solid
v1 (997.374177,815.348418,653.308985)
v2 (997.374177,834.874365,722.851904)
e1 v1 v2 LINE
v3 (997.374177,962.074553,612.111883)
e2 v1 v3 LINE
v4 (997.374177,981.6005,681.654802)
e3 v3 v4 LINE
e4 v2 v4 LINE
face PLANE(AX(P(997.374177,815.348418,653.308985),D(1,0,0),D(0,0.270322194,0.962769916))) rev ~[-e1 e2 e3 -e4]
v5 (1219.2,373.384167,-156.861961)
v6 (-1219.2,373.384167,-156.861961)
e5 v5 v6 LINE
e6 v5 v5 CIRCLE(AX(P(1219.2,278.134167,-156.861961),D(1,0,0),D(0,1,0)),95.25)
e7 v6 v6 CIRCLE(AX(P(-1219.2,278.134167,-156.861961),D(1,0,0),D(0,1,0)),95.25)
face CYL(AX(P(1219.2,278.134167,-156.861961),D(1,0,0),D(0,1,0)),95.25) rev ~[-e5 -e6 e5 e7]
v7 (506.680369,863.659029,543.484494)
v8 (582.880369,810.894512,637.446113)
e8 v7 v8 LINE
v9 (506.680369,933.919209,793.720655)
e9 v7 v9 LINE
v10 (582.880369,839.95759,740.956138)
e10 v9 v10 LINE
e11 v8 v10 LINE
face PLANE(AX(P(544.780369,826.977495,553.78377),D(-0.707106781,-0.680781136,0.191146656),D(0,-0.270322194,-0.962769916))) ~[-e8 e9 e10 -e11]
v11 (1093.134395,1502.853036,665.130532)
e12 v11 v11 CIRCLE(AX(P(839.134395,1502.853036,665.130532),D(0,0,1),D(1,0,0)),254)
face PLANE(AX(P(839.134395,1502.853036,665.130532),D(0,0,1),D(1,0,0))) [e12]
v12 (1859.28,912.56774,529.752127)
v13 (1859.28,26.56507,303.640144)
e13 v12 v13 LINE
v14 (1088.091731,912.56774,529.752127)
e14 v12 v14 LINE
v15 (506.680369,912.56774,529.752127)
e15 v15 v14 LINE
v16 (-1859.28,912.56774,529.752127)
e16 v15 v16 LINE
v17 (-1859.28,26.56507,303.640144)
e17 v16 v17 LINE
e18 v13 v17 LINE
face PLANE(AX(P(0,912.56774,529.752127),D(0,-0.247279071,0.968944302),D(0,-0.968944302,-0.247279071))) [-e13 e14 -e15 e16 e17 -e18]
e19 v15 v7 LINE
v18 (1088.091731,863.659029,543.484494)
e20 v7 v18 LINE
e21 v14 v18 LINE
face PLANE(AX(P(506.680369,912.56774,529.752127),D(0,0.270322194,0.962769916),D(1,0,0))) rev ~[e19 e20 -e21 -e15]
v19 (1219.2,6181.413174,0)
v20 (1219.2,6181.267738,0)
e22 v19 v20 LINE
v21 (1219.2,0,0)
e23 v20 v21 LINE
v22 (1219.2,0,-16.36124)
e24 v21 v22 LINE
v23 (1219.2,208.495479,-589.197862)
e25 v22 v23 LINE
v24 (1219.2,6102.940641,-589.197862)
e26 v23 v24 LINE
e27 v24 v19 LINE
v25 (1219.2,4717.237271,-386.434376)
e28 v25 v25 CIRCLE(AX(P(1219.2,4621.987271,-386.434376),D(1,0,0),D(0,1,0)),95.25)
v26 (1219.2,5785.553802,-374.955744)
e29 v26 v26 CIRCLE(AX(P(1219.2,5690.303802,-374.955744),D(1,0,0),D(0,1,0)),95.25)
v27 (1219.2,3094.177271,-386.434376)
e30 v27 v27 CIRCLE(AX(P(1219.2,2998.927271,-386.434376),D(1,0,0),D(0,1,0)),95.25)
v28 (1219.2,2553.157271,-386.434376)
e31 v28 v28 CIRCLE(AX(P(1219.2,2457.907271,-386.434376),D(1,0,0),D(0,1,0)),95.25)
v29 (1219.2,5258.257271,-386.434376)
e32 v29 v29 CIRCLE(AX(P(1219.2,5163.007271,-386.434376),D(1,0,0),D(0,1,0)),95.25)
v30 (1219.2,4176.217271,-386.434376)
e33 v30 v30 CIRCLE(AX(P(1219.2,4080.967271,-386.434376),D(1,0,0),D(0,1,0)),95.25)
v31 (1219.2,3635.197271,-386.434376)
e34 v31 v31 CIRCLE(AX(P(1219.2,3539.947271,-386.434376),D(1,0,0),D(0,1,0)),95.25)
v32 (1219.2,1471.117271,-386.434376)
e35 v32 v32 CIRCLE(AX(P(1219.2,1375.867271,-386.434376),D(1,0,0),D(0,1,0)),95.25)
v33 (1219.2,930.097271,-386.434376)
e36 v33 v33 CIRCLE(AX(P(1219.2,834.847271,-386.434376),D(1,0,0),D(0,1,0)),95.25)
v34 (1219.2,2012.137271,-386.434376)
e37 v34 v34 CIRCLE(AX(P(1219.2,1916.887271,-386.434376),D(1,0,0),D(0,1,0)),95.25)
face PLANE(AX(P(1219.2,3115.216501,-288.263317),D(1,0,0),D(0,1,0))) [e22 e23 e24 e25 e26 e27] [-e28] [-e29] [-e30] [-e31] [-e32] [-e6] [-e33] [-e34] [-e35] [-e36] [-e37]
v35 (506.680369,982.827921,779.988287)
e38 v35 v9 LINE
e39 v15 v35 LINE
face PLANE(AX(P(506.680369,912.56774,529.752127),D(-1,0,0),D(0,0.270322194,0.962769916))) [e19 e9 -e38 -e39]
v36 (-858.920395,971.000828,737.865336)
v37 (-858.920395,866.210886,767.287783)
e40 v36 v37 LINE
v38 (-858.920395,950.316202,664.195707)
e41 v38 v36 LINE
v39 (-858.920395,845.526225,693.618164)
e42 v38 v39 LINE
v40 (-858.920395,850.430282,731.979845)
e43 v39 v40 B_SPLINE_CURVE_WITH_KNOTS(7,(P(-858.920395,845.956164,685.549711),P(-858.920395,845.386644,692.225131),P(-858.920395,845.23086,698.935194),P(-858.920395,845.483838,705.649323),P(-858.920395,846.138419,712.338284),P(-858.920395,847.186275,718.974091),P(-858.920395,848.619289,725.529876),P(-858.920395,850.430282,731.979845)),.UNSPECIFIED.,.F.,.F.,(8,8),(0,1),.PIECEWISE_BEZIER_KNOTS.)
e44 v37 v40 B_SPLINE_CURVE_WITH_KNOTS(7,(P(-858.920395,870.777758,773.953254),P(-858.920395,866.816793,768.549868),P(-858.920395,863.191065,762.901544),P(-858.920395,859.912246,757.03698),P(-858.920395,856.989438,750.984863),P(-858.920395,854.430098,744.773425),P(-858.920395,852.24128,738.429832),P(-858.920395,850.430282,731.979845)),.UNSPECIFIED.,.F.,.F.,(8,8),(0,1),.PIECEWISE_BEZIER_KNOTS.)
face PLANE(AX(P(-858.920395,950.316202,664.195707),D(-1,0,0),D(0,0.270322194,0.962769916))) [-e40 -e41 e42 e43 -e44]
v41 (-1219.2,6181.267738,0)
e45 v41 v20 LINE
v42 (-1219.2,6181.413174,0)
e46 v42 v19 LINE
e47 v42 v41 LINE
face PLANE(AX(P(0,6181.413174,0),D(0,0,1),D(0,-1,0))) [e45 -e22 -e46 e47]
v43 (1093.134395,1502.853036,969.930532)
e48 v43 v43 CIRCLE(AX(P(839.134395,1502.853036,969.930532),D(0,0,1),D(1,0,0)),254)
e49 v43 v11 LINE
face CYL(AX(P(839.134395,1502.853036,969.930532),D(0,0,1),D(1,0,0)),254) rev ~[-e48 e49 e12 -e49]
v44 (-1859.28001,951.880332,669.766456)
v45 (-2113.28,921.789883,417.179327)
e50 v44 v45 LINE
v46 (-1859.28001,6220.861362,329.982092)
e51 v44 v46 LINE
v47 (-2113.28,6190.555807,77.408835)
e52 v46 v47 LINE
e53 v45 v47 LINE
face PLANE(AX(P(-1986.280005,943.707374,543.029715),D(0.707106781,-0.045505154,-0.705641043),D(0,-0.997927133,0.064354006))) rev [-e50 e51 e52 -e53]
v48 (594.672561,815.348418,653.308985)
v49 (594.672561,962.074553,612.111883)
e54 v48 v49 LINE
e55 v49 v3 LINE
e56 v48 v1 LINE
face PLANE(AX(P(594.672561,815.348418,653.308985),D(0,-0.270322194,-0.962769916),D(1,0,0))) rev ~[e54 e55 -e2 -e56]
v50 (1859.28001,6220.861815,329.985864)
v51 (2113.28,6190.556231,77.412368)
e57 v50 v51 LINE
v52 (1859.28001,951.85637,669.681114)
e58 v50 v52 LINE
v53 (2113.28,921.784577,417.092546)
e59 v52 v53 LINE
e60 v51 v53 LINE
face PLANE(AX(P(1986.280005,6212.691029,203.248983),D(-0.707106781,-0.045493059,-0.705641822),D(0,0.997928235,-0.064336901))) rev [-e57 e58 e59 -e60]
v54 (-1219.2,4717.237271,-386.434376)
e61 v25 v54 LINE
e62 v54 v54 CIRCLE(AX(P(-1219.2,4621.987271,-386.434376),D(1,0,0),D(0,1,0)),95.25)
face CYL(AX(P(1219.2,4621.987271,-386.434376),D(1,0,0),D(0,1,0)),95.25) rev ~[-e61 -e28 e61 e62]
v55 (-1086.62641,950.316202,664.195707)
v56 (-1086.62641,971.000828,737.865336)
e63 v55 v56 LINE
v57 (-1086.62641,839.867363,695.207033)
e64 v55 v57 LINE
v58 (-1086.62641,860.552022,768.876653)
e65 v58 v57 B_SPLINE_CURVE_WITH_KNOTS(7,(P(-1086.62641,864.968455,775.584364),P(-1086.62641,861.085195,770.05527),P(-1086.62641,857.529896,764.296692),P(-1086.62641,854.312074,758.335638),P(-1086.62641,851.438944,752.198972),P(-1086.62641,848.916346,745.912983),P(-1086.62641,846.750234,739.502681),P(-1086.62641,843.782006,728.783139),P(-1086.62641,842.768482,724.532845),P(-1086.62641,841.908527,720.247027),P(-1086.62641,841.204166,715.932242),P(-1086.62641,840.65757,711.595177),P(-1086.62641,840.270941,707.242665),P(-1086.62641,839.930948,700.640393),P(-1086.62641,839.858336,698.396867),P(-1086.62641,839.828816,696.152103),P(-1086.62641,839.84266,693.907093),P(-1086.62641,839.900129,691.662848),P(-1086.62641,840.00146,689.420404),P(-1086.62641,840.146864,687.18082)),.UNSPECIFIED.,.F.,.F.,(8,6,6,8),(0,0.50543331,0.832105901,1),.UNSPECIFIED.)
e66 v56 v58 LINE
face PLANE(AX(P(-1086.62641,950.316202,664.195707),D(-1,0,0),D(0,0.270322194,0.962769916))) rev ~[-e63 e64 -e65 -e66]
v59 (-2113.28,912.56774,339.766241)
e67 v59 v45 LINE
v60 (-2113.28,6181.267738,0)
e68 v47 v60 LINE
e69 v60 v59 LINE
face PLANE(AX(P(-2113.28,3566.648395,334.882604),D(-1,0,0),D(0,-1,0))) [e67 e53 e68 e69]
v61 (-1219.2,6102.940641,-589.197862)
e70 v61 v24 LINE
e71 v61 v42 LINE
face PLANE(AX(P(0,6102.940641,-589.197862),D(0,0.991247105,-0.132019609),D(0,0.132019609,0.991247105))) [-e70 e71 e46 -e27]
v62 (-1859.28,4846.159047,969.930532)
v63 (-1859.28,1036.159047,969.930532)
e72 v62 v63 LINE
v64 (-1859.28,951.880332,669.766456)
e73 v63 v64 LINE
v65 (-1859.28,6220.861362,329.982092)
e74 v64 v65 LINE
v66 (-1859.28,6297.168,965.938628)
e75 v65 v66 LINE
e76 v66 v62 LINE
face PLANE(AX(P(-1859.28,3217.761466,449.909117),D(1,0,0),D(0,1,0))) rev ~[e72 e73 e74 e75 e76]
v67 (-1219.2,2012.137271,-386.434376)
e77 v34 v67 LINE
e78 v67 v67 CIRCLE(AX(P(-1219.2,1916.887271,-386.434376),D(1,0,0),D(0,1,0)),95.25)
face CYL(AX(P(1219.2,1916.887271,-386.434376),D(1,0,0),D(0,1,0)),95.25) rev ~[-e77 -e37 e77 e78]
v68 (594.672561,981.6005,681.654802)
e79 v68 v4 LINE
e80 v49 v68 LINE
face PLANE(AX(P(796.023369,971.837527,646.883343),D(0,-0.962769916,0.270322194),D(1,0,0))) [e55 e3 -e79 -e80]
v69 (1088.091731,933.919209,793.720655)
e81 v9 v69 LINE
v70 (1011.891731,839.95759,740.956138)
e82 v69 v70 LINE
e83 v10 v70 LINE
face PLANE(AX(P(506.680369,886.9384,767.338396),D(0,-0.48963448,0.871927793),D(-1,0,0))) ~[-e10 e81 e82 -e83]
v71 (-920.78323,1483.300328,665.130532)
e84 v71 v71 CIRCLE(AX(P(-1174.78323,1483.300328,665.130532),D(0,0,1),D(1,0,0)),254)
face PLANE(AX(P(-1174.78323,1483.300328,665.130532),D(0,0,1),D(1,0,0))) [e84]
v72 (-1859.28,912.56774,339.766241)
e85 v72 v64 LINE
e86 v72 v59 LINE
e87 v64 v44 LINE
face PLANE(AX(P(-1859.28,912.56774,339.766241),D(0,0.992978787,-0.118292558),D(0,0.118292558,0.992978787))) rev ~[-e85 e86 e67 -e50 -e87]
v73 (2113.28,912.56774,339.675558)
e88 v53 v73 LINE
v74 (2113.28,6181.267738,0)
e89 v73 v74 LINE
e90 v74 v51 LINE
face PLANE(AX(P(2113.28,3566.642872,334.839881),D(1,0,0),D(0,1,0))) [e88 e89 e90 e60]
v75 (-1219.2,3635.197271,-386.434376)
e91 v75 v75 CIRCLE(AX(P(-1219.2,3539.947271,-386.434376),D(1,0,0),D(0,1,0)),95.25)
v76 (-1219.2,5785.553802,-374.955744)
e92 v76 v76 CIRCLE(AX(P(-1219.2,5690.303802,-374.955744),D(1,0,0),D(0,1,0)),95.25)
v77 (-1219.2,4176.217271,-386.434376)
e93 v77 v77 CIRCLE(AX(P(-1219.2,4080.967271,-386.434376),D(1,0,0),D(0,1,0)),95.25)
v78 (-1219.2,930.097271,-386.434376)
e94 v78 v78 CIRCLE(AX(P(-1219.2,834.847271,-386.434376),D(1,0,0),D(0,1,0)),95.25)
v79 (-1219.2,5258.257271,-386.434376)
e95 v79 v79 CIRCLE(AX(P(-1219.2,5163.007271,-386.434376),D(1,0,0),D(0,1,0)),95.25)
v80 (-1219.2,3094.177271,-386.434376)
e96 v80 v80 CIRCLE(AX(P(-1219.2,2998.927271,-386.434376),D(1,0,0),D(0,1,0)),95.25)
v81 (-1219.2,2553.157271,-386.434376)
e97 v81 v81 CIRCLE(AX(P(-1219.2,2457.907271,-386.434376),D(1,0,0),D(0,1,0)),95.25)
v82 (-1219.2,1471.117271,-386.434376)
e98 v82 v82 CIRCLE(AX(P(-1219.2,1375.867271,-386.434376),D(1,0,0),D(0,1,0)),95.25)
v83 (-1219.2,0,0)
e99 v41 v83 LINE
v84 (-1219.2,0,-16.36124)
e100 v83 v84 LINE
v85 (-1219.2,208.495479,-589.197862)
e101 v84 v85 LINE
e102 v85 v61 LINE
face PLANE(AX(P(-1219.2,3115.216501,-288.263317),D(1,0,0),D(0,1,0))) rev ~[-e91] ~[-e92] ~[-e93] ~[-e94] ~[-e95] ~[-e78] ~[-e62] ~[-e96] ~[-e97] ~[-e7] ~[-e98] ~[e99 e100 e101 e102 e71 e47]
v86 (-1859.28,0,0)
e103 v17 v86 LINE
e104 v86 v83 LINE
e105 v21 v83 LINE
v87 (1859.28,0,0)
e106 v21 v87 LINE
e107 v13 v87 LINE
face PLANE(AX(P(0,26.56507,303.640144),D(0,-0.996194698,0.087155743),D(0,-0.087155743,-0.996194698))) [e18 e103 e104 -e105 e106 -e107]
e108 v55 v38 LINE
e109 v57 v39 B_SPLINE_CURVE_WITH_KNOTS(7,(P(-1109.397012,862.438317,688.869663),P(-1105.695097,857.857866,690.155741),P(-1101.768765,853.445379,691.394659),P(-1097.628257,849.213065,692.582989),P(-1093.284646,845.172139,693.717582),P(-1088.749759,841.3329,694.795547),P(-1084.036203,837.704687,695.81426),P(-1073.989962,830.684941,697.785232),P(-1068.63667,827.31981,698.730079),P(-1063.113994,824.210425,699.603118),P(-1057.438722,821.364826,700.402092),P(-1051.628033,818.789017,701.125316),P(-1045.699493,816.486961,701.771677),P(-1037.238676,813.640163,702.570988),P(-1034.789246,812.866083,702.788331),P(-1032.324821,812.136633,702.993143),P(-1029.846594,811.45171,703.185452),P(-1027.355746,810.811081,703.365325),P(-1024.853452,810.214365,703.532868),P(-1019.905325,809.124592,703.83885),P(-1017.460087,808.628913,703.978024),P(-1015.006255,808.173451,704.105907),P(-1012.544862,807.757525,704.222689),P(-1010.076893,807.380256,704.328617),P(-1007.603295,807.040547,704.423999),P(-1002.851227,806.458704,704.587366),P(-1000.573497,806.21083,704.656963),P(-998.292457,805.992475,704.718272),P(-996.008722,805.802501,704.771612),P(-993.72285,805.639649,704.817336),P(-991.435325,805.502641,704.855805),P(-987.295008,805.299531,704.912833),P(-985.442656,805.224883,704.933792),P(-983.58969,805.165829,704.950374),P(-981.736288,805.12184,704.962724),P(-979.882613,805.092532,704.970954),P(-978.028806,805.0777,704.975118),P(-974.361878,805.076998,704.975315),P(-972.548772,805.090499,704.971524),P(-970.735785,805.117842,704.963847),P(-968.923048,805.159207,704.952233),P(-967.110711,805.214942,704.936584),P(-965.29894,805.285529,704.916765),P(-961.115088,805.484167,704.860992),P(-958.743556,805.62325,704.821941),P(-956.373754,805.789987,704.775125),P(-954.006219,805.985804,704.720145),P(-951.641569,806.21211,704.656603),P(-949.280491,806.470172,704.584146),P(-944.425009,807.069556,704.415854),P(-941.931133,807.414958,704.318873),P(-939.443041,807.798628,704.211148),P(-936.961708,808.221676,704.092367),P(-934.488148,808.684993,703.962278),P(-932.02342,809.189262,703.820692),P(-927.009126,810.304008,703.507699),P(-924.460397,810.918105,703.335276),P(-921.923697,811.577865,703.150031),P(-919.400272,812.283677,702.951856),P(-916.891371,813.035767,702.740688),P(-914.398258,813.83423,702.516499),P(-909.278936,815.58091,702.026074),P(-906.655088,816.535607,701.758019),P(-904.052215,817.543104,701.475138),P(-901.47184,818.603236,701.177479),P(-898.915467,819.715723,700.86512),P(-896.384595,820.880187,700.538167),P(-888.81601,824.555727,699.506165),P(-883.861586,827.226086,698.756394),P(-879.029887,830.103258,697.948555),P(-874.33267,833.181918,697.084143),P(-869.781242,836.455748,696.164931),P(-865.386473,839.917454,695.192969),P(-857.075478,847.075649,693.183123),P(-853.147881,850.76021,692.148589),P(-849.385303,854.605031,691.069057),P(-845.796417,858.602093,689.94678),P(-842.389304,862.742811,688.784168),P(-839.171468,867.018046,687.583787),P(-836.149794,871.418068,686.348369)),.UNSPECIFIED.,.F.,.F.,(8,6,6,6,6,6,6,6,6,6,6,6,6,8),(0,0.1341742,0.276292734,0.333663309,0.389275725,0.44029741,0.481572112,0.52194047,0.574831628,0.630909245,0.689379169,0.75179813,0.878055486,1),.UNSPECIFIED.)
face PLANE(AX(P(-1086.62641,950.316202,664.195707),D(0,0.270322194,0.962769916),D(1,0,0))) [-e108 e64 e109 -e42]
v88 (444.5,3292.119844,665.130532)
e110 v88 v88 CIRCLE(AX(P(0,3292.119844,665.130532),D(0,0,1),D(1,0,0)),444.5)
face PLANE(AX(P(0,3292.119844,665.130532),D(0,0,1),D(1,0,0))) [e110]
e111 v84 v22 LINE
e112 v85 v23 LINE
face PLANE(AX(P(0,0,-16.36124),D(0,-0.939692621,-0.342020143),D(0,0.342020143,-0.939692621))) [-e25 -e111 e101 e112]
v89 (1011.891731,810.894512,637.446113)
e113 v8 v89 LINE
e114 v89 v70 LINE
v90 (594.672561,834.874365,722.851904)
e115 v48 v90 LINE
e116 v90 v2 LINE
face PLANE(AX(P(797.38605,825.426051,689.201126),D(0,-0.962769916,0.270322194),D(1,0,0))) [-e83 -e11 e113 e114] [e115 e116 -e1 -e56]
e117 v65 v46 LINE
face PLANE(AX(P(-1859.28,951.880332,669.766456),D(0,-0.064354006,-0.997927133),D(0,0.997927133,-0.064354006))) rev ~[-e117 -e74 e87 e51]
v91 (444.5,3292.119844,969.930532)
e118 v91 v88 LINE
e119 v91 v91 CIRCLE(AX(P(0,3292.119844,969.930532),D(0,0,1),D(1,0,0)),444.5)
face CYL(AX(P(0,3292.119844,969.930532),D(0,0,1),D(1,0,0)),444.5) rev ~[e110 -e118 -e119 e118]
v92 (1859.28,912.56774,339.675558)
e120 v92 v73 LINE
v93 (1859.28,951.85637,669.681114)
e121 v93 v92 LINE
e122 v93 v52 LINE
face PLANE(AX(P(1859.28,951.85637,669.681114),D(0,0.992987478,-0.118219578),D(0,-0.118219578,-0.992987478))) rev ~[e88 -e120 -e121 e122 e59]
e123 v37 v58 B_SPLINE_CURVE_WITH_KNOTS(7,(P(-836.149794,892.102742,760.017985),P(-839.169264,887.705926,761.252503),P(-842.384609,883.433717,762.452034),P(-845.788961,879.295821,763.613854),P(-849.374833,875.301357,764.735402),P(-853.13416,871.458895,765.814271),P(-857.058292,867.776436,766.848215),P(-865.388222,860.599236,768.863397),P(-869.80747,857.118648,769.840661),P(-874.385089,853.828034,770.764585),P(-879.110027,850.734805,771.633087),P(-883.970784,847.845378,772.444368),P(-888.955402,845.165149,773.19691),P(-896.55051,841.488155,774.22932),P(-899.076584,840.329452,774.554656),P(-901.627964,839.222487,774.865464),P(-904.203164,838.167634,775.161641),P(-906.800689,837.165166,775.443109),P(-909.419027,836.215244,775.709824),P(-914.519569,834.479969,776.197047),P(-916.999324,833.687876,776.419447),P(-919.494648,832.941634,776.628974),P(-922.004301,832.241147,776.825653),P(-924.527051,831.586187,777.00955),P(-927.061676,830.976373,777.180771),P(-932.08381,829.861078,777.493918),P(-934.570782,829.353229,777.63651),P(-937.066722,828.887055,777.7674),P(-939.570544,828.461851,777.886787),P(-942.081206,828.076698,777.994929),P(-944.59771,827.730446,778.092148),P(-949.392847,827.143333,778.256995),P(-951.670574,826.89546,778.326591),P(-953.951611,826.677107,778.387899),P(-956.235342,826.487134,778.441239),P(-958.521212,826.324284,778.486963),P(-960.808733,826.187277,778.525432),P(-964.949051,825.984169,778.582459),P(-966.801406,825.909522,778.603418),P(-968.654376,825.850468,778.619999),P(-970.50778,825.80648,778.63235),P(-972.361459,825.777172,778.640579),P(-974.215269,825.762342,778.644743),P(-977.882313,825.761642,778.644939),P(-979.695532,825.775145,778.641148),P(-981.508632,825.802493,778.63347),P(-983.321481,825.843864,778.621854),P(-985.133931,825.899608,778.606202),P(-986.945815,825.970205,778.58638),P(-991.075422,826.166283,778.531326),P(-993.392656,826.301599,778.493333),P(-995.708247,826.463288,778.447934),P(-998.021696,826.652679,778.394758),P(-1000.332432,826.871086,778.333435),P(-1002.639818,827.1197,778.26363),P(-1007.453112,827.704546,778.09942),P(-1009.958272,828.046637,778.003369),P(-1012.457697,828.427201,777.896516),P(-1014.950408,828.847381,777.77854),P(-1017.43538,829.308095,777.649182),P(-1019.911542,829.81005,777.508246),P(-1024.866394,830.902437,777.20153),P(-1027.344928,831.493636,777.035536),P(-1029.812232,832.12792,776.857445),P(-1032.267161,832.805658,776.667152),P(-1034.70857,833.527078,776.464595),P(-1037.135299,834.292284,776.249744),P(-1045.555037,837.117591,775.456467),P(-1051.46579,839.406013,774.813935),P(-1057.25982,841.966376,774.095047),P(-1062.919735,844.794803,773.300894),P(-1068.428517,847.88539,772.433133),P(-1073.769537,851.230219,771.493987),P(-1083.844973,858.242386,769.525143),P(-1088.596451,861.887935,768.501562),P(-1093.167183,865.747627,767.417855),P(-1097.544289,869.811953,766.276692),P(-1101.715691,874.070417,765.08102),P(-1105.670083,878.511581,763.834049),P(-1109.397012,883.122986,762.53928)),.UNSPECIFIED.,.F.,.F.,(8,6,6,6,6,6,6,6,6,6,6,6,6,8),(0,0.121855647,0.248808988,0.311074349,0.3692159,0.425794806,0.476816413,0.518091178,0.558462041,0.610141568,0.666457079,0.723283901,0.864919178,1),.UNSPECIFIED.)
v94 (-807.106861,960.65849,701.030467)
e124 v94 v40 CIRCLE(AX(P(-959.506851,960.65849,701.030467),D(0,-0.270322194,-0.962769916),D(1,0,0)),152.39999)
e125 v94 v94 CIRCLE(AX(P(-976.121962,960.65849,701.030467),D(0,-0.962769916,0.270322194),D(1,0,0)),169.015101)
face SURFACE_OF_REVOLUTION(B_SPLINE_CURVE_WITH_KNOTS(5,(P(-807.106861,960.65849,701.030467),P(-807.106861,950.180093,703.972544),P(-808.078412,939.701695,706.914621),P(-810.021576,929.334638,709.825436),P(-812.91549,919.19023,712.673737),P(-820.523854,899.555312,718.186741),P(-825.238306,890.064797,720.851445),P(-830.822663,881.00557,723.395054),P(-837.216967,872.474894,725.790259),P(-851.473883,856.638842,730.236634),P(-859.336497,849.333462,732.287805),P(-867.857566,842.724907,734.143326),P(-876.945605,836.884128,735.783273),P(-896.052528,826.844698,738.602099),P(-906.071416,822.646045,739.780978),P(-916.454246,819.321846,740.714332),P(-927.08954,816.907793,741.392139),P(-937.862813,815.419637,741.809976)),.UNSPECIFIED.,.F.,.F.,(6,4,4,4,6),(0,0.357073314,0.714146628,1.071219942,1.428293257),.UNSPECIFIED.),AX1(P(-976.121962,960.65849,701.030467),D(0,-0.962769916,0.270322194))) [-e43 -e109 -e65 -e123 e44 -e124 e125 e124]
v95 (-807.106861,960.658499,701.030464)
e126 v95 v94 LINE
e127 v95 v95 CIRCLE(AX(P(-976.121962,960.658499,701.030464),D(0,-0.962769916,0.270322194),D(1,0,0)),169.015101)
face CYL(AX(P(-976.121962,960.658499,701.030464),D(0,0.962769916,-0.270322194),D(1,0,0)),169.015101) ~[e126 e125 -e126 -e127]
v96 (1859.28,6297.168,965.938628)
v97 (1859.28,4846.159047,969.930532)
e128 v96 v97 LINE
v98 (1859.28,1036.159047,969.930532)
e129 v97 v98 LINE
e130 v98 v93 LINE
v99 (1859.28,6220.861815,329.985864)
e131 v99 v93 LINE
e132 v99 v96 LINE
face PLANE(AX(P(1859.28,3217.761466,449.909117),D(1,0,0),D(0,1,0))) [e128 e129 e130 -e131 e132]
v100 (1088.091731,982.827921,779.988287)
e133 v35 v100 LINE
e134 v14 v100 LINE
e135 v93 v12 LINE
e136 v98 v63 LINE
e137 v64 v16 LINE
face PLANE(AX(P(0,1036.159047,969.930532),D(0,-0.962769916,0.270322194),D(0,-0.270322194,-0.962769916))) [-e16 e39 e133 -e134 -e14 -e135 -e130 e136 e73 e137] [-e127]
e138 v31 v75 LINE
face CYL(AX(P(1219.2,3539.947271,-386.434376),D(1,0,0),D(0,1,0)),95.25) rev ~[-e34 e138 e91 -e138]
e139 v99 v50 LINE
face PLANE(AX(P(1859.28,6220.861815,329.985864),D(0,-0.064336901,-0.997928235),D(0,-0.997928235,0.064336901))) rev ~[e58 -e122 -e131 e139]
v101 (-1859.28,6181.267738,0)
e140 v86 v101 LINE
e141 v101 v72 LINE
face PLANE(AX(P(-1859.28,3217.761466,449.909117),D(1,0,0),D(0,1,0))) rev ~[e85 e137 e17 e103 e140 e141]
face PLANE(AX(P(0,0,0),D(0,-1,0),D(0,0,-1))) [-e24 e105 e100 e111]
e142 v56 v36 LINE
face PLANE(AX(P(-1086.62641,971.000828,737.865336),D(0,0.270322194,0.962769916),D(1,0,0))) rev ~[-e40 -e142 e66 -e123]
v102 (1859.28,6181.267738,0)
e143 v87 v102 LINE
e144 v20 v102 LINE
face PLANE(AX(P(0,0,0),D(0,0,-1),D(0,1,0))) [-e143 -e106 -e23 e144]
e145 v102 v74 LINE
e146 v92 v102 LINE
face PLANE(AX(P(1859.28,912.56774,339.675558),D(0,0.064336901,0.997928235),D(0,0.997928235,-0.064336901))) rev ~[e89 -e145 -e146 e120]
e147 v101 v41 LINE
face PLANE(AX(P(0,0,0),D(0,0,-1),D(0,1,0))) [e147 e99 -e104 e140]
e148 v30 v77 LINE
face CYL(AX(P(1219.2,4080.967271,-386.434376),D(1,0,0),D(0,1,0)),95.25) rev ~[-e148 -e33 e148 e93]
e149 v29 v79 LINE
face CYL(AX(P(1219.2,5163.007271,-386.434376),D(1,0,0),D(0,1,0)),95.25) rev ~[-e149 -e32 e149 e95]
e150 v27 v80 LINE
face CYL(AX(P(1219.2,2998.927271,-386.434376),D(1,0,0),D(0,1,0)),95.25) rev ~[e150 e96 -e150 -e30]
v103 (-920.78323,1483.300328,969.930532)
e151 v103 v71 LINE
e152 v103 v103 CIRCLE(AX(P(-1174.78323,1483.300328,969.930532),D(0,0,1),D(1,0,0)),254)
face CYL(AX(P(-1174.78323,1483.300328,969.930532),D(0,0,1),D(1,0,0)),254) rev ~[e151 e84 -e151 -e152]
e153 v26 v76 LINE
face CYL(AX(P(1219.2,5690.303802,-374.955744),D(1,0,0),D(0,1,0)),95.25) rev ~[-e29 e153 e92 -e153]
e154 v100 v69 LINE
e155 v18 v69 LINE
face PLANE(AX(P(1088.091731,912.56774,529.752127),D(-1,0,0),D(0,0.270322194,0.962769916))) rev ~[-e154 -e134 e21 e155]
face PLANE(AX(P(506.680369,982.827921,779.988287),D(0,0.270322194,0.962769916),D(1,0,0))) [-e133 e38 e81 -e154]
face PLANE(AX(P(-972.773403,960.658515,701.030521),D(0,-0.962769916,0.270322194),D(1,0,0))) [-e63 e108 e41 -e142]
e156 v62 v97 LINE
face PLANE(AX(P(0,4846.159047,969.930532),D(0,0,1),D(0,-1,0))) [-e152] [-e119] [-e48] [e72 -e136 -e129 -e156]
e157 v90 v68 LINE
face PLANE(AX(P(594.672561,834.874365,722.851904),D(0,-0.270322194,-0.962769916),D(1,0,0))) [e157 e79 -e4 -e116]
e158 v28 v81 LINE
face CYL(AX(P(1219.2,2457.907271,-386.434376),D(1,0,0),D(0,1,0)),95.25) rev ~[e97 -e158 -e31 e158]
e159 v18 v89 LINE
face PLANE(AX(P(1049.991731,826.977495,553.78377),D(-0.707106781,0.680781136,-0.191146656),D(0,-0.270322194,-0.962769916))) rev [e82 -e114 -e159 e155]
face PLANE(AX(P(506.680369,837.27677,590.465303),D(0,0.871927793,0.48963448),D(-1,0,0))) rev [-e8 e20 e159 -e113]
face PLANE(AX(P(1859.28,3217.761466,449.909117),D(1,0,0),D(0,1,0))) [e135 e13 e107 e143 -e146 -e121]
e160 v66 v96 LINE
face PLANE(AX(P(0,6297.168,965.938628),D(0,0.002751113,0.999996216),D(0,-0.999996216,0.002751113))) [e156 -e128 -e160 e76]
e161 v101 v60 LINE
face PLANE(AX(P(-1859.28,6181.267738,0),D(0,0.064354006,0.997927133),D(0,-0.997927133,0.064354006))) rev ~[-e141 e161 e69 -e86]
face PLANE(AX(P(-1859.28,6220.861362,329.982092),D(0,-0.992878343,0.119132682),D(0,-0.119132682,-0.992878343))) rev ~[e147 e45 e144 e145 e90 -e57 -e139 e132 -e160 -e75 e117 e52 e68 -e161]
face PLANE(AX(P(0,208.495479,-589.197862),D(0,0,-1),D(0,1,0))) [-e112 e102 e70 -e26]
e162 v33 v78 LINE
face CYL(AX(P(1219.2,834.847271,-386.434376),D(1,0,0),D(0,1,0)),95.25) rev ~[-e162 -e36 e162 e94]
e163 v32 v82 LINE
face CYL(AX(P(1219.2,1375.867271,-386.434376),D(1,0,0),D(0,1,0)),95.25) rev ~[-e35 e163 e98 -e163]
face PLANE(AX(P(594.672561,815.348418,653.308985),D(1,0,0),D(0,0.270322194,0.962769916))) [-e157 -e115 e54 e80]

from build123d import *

# Parameters (mm, degrees)
F1_DEPTH      = 1859.28
F1_DEPTH_BACK = 1859.28
F3_DEPTH      = 1219.2
F3_DEPTH_BACK = 1219.2
F4_R          = 169.0151007429
F5_DEPTH      = 152.4
F6_R          = 152.39999
F7_W          = 227.70601511
F7_H          = 76.5184164047
F8_DEPTH      = 609.6
F9_W          = 581.4113616943
F9_H          = 259.9127333882
F10_DEPTH     = 127
F11_SIZE      = 76.2
F12_W         = 402.7016162872
F12_H         = 72.2321271896
F13_DEPTH     = 152.4
F14_R         = 254
F15_DEPTH     = 304.8
F16_R         = 444.5
F17_DEPTH     = 304.8
F19_DEPTH     = 254
F20_SIZE      = 253.99999
F22_DEPTH     = 254
F23_SIZE      = 253.99999
F24_R         = 95.25
F25_DEPTH     = 3048


# Not quite as in the source:
# - a fillet or chamfer is up to 0.001 mm smaller than in the source, because OpenCascade refuses the exact size


with BuildPart() as f1:
    # F0 (on Right) → F1 (new body, two sides)
    with BuildSketch(Plane.YZ) as f1_sk:
        Polygon((26.5650703895, 303.6401439784), (0, 0), (6181.2677383423, 0), (6297.168, 965.9386277199), (4846.1590473673, 969.9305323602), (1036.1590473673, 969.9305323602), (912.5677404125, 529.7521266595), align=None)
    extrude(amount=F1_DEPTH)
    extrude(f1_sk.sketch, amount=-F1_DEPTH_BACK)

    # F2 (on Right) → F3 (join, two sides)
    with BuildSketch(Plane.YZ) as f3_sk:
        Polygon((0, 0), (0, -16.3612399525), (208.4954793713, -589.1978615836), (6102.9406406674, -589.1978615836), (6181.4131736755, 0), align=None)
    extrude(amount=F3_DEPTH)
    extrude(f3_sk.sketch, amount=-F3_DEPTH_BACK)

    # F4 (on face) → F5 (join)
    with BuildSketch(Plane(origin=(0, 708.0104155563, -198.7919703987), x_dir=(1, 0, 0), z_dir=(0, -0.9627699162, 0.2703221937))):
        with Locations((-976.1219620705, 934.6183538437)):
            Circle(F4_R)
    extrude(amount=F5_DEPTH)

    # F6 (radius 152.4 in the source; OpenCascade refuses exactly that, so slightly less here)
    f6_edges = [f1.edges().sort_by_distance(p)[0] for p in [
        (-1145.137063, 813.932364, 742.227566),
    ]]
    fillet(f6_edges, radius=F6_R)

    # F7 (on face) → F8 (cut)
    with BuildSketch(Plane(origin=(0, 708.0104155563, -198.7919703987), x_dir=(1, 0, 0), z_dir=(0, -0.9627699162, 0.2703221937))):
        with Locations((-972.7734029293, 934.6184134483)):
            Rectangle(F7_W, F7_H)
    extrude(amount=F8_DEPTH, mode=Mode.SUBTRACT)

    # F9 (on face) → F10 (join)
    with BuildSketch(Plane(origin=(0, 708.0104155563, -198.7919703987), x_dir=(1, 0, 0), z_dir=(0, -0.9627699162, 0.2703221937))):
        with Locations((797.3860502243, 886.6730907796)):
            Rectangle(F9_W, F9_H)
    extrude(amount=F10_DEPTH)

    # F11
    f11_edges = [f1.edges().sort_by_distance(p)[0] for p in [
        (797.38605, 860.556141, 814.319206),
        (1088.091731, 825.426051, 689.201126),
        (797.38605, 790.295961, 564.083045),
        (506.680369, 825.426051, 689.201126),
    ]]
    chamfer(f11_edges, length=F11_SIZE)

    # F12 (on face) → F13 (cut)
    with BuildSketch(Plane(origin=(0, 585.738636195, -164.4610518002), x_dir=(1, 0, 0), z_dir=(0, -0.9627699162, 0.2703221937))):
        with Locations((796.0233688354, 885.5090737343)):
            Rectangle(F12_W, F12_H)
    extrude(amount=-F13_DEPTH, mode=Mode.SUBTRACT)

    # F14 (on face) → F15 (cut)
    with BuildSketch(Plane.XY.offset(969.9305323602)):
        with Locations((-1174.7832298279, 1483.3003282547)):
            Circle(F14_R)
        with Locations((839.1343951225, 1502.8530359268)):
            Circle(F14_R)
    extrude(amount=-F15_DEPTH, mode=Mode.SUBTRACT)

    # F16 (on face) → F17 (cut)
    with BuildSketch(Plane.XY.offset(969.9305323602)):
        with Locations((0, 3292.1198442413)):
            Circle(F16_R)
    extrude(amount=-F17_DEPTH, mode=Mode.SUBTRACT)

    # F18 (on face) → F19 (join)
    with BuildSketch(Plane.YZ.offset(1859.28)):
        Polygon((6220.8618148868, 329.9858638469), (951.8563702908, 669.6811142889), (912.5677404126, 339.6755581523), (6181.2677383423, 0), align=None)
    extrude(amount=F19_DEPTH)

    # F20 (size 254 in the source; OpenCascade refuses exactly that, so slightly less here)
    f20_edges = [f1.edges().sort_by_distance(p)[0] for p in [
        (2113.28, 3586.359093, 499.833489),
    ]]
    chamfer(f20_edges, length=F20_SIZE)

    # F21 (on face) → F22 (join)
    with BuildSketch(Plane(origin=(-1859.28, 0, 0), x_dir=(0, -1, 0), z_dir=(-1, 0, 0))):
        Polygon((-6220.8613622852, 329.9820917646), (-6181.2677383423, 0), (-912.5677404125, 339.7662410411), (-951.8803321296, 669.7664559221), align=None)
    extrude(amount=F22_DEPTH)

    # F23 (size 254 in the source; OpenCascade refuses exactly that, so slightly less here)
    f23_edges = [f1.edges().sort_by_distance(p)[0] for p in [
        (-2113.28, 3586.370847, 499.874274),
    ]]
    chamfer(f23_edges, length=F23_SIZE)

    # F24 (on face) → F25 (cut)
    with BuildSketch(Plane.YZ.offset(1219.2)):
        with Locations((278.1341671944, -156.8619608879)):
            Circle(F24_R)
        with Locations((834.8472714424, -386.4343762398)):
            Circle(F24_R)
        with Locations((1375.8672714424, -386.4343762398)):
            Circle(F24_R)
        with Locations((1916.8872714424, -386.4343762398)):
            Circle(F24_R)
        with Locations((2457.9072714424, -386.4343762398)):
            Circle(F24_R)
        with Locations((2998.9272714424, -386.4343762398)):
            Circle(F24_R)
        with Locations((3539.9472714424, -386.4343762398)):
            Circle(F24_R)
        with Locations((4080.9672714424, -386.4343762398)):
            Circle(F24_R)
        with Locations((4621.9872714424, -386.4343762398)):
            Circle(F24_R)
        with Locations((5163.0072714424, -386.4343762398)):
            Circle(F24_R)
        with Locations((5690.3038024902, -374.9557435513)):
            Circle(F24_R)
    extrude(amount=-F25_DEPTH, mode=Mode.SUBTRACT)


solid = f1.part
